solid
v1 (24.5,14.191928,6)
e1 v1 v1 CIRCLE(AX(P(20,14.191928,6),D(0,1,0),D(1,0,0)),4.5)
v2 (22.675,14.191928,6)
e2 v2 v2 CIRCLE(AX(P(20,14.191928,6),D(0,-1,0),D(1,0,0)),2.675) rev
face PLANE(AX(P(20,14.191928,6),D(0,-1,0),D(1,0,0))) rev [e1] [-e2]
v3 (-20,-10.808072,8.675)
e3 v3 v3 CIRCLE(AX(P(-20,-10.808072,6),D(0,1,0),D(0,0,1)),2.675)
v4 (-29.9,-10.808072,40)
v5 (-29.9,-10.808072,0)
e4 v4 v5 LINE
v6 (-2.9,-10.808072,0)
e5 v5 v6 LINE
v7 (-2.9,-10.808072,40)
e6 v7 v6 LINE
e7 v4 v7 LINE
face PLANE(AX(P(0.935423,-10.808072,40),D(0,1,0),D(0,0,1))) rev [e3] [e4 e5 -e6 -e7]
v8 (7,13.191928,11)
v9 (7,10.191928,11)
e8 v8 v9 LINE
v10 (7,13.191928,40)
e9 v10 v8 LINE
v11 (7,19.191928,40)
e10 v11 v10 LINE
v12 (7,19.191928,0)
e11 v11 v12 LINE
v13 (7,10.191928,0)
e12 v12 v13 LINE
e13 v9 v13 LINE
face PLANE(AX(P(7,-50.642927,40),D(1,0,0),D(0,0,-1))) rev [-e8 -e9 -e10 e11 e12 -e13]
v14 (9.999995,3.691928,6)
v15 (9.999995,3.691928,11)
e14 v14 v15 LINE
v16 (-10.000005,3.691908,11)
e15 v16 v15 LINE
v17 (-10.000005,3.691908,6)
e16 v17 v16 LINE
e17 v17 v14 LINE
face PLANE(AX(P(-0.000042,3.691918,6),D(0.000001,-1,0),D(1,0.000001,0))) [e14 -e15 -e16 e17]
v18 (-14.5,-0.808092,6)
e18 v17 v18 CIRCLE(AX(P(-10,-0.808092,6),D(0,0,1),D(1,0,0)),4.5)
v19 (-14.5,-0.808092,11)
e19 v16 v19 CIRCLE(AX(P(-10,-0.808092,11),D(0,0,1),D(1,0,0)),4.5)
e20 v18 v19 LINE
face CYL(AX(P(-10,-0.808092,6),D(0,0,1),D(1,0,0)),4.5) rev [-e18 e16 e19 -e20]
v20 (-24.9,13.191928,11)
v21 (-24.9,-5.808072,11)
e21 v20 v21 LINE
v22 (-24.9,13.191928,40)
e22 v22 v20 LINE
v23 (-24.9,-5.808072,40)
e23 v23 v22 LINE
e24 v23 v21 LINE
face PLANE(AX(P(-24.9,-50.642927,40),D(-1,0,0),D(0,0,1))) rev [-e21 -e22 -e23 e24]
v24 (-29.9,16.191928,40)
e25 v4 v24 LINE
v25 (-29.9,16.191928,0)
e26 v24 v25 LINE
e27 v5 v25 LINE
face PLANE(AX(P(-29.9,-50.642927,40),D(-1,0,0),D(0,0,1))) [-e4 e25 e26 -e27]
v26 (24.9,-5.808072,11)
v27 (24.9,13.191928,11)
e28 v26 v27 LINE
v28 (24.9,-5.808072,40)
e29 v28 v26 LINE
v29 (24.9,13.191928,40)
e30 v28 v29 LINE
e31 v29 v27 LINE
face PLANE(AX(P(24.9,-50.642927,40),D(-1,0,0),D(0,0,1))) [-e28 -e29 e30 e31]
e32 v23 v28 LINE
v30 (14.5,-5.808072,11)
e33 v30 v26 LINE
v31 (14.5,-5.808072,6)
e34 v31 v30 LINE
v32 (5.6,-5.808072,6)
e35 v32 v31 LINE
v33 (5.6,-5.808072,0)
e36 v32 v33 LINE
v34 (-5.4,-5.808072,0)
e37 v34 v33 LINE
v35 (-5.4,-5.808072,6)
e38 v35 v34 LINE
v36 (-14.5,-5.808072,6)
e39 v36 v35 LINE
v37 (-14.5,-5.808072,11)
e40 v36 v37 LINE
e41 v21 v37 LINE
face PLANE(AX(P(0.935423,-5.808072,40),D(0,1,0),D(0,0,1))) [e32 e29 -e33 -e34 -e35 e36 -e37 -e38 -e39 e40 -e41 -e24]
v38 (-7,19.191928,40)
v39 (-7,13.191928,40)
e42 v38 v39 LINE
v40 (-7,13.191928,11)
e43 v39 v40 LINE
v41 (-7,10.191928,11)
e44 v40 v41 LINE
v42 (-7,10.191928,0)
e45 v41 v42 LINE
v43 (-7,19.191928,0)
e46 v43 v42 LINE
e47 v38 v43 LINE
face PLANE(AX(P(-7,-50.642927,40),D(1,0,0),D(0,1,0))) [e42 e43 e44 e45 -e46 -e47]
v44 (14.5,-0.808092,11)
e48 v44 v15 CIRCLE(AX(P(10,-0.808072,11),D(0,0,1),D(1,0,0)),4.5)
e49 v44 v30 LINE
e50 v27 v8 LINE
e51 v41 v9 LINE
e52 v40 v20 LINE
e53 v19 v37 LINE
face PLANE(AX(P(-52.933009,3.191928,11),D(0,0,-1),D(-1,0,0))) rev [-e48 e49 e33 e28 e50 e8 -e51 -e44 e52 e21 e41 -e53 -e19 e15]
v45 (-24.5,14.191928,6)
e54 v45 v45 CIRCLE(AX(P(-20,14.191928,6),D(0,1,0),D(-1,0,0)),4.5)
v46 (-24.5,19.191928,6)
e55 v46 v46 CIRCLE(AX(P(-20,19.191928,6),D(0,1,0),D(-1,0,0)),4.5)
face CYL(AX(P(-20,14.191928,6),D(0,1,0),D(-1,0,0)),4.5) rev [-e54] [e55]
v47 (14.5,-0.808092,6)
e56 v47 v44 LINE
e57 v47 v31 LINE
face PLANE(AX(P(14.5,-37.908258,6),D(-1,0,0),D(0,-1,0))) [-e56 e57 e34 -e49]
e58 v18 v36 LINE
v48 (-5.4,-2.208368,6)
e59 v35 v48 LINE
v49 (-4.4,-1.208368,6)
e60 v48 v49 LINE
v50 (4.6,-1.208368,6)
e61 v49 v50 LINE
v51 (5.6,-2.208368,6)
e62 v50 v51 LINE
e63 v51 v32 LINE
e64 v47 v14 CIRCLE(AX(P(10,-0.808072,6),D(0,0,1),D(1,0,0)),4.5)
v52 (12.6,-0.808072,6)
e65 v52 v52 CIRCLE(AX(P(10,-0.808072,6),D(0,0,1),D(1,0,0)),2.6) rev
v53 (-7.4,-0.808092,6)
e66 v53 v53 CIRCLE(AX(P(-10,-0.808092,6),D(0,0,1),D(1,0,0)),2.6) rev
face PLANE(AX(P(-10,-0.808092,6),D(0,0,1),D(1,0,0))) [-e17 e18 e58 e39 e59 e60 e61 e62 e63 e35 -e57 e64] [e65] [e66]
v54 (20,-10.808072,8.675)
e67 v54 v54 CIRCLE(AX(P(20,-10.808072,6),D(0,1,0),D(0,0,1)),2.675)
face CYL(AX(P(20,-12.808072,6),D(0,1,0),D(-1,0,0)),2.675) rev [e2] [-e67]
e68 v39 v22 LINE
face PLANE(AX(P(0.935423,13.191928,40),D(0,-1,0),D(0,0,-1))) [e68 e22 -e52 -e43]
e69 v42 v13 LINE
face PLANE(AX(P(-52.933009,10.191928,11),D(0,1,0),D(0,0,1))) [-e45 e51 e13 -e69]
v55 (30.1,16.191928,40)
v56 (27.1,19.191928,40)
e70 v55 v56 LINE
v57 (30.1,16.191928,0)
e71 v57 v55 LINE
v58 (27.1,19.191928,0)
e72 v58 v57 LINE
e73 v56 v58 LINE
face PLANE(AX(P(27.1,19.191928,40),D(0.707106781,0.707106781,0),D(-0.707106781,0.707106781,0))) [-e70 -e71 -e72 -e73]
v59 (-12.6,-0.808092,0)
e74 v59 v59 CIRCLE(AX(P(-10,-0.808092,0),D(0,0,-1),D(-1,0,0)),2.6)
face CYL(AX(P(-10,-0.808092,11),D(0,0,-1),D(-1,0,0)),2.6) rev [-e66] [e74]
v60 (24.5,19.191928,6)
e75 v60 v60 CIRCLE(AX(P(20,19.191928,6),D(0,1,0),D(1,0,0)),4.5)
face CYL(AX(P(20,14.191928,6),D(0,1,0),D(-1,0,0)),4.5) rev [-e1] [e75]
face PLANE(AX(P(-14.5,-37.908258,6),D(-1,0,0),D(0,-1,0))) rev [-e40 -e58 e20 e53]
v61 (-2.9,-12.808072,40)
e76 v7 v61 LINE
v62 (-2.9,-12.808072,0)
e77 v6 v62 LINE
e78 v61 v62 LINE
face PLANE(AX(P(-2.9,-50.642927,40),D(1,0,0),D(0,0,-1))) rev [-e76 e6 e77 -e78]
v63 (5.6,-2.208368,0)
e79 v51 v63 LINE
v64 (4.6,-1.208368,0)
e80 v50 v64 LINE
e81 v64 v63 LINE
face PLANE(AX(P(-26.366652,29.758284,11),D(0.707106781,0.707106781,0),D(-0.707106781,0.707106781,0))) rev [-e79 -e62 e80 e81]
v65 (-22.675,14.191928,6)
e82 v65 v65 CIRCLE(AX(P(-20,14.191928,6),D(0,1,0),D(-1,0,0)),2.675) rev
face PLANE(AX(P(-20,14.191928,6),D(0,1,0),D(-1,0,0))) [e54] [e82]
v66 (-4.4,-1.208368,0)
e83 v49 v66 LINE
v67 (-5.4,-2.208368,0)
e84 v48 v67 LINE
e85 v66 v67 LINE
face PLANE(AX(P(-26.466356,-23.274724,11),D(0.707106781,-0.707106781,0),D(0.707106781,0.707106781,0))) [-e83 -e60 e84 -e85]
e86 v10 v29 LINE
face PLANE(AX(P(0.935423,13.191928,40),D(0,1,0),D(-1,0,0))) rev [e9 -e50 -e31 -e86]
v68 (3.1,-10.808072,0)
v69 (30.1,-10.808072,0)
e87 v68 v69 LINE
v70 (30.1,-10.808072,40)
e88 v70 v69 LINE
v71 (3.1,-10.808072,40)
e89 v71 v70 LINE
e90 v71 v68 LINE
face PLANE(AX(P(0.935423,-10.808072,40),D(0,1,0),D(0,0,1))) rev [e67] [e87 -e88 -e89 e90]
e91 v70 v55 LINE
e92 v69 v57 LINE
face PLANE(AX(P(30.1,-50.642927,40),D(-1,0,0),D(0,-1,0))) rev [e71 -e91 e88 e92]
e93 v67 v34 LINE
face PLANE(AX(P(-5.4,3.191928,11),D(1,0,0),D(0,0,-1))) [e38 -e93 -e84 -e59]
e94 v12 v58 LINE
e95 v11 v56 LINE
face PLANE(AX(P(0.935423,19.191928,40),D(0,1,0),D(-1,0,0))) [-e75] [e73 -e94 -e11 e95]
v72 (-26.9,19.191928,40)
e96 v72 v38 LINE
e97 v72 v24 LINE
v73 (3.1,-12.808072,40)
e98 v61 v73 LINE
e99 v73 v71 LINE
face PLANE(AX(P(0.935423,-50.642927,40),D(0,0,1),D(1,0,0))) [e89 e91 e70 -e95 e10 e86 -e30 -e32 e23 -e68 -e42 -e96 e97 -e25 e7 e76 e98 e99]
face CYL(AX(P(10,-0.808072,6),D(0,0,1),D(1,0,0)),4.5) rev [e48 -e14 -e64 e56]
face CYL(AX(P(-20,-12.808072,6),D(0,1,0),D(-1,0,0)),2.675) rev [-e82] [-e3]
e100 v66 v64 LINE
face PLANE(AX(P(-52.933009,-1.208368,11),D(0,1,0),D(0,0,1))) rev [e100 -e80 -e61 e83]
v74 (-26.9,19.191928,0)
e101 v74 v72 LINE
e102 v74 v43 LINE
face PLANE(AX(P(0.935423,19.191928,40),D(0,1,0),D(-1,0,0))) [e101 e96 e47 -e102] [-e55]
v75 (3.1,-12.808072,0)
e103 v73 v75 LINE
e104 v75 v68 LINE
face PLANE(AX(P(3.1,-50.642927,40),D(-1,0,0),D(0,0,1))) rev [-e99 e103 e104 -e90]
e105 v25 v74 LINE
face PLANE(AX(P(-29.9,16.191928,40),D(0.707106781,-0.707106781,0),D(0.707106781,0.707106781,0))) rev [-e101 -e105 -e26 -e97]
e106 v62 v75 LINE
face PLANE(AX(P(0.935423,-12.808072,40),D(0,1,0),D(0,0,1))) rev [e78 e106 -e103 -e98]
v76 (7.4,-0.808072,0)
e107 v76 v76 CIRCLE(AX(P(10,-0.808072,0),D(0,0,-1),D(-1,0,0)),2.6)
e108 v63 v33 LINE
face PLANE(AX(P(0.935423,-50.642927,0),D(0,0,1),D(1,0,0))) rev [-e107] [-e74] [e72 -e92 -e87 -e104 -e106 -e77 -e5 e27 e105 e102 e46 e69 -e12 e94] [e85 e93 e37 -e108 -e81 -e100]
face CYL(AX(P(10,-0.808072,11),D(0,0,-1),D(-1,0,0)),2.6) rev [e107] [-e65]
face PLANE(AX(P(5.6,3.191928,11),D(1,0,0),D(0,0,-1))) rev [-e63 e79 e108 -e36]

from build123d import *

# Parameters (mm, degrees)
BOSS_EXTRUDE1_DEPTH = 40
SKETCH2_R           = 2.6
BOSS_EXTRUDE2_DEPTH = 11
SKETCH3_R           = 4.5
CUT_EXTRUDE1_DEPTH  = 5
CHAMFER1_SIZE       = 3
SKETCH4_R           = 2.675
CUT_EXTRUDE5_DEPTH  = 60.413887266
SKETCH5_R           = 4.5
CUT_EXTRUDE6_DEPTH  = 5
CUT_EXTRUDE7_START  = -5
CUT_EXTRUDE7_DEPTH  = 5


# Read off the part's stored shape, not the designer's step: Cut-Extrude7
with BuildPart() as part:
    # Sketch1 → Boss-Extrude1 (new body)
    with BuildSketch(Plane.XY):
        Polygon((-29.9, 19.191927939), (-29.9, -10.808072061), (-2.9, -10.808072061), (-2.9, -12.808072061), (3.1, -12.808072061), (3.1, -10.808072061), (30.1, -10.808072061), (30.1, 19.191927939), (7, 19.191927939), (7, 13.191927939), (24.9, 13.191927939), (24.9, -5.808072061), (5.6, -5.808072061), (-5.4, -5.808072061), (-24.9, -5.808072061), (-24.9, 13.191927939), (-7, 13.191927939), (-7, 19.191927939), align=None)
    extrude(amount=BOSS_EXTRUDE1_DEPTH)

    # Sketch2 → Boss-Extrude2 (add)
    with BuildSketch(Plane(origin=(0, 0, 0), x_dir=(-1, 0, 0), z_dir=(0, 0, -1))):
        Polygon((-7, 10.191927939), (-7, 13.191927939), (-24.9, 13.191927939), (-24.9, -5.808072061), (-5.6, -5.808072061), (-5.6, -2.208368155), (-4.6, -1.208368155), (4.4, -1.208368155), (5.4, -2.208368155), (5.4, -5.808072061), (24.9, -5.808072061), (24.9, 13.191927939), (7, 13.191927939), (7, 10.191927939), align=None)
        with Locations((-10, -0.808072061)):
            Circle(SKETCH2_R, mode=Mode.SUBTRACT)
        with Locations((10, -0.808092061)):
            Circle(SKETCH2_R, mode=Mode.SUBTRACT)
    extrude(amount=-BOSS_EXTRUDE2_DEPTH)

    # Sketch3 → Cut-Extrude1 (cut)
    with BuildSketch(Plane.XY.offset(11)):
        with Locations((-10, -0.808092061)):
            Circle(SKETCH3_R)
        with Locations((10, -0.808072061)):
            Circle(SKETCH3_R)
    extrude(amount=-CUT_EXTRUDE1_DEPTH, mode=Mode.SUBTRACT)

    # Chamfer1
    chamfer1_edges = [part.edges().sort_by_distance(p)[0] for p in [
        (-29.9, 19.191927939, 20),
        (30.1, 19.191927939, 20),
    ]]
    chamfer(chamfer1_edges, length=CHAMFER1_SIZE)

    # Sketch4 → Cut-Extrude5 (cut, through all)
    with BuildSketch(Plane(origin=(0, 19.191927939, 0), x_dir=(1, 0, 0), z_dir=(0, 1, 0))):
        with Locations(Location((-20, -6, 0), (0, 0, 180))):
            Circle(SKETCH4_R)
        with Locations(Location((20, -6, 0), (0, 0, 270))):
            Circle(SKETCH4_R)
    extrude(amount=-CUT_EXTRUDE5_DEPTH, mode=Mode.SUBTRACT)

    # Sketch5 → Cut-Extrude6 (cut)
    with BuildSketch(Plane(origin=(0, 19.191927939, 0), x_dir=(1, 0, 0), z_dir=(0, 1, 0))):
        with Locations(Location((-20, -6, 0), (0, 0, 180))):
            Circle(SKETCH5_R)
        with Locations((20, -6)):
            Circle(SKETCH5_R)
    extrude(amount=-CUT_EXTRUDE6_DEPTH, mode=Mode.SUBTRACT)

    # Cut-Extrude7 outline → Cut-Extrude7 (cut)
    with BuildSketch(Plane.XY.offset(11).offset(CUT_EXTRUDE7_START)):
        with BuildLine():
            Line((9.9999955, 3.691927939), (-10.0000045, 3.691907939))
            ThreePointArc((-10.0000045, 3.691907939), (-6.818017894, -3.990070985), (-14.5, -0.808092061))
            Line((-14.5, -0.808092061), (-14.5, -5.808072061))
            Line((-14.5, -5.808072061), (-5.4, -5.808072061))
            Line((-5.4, -5.808072061), (-5.4, -2.208368155))
            Line((-5.4, -2.208368155), (-4.4, -1.208368155))
            Line((-4.4, -1.208368155), (4.6, -1.208368155))
            Line((4.6, -1.208368155), (5.6, -2.208368155))
            Line((5.6, -2.208368155), (5.6, -5.808072061))
            Line((5.6, -5.808072061), (14.5, -5.808072061))
            Line((14.5, -5.808072061), (14.5, -0.808072061))
            ThreePointArc((14.5, -0.808072061), (6.818021076, -3.990054167), (9.9999955, 3.691927939))
        make_face()
    extrude(amount=CUT_EXTRUDE7_DEPTH, mode=Mode.SUBTRACT)


solid = part.part
